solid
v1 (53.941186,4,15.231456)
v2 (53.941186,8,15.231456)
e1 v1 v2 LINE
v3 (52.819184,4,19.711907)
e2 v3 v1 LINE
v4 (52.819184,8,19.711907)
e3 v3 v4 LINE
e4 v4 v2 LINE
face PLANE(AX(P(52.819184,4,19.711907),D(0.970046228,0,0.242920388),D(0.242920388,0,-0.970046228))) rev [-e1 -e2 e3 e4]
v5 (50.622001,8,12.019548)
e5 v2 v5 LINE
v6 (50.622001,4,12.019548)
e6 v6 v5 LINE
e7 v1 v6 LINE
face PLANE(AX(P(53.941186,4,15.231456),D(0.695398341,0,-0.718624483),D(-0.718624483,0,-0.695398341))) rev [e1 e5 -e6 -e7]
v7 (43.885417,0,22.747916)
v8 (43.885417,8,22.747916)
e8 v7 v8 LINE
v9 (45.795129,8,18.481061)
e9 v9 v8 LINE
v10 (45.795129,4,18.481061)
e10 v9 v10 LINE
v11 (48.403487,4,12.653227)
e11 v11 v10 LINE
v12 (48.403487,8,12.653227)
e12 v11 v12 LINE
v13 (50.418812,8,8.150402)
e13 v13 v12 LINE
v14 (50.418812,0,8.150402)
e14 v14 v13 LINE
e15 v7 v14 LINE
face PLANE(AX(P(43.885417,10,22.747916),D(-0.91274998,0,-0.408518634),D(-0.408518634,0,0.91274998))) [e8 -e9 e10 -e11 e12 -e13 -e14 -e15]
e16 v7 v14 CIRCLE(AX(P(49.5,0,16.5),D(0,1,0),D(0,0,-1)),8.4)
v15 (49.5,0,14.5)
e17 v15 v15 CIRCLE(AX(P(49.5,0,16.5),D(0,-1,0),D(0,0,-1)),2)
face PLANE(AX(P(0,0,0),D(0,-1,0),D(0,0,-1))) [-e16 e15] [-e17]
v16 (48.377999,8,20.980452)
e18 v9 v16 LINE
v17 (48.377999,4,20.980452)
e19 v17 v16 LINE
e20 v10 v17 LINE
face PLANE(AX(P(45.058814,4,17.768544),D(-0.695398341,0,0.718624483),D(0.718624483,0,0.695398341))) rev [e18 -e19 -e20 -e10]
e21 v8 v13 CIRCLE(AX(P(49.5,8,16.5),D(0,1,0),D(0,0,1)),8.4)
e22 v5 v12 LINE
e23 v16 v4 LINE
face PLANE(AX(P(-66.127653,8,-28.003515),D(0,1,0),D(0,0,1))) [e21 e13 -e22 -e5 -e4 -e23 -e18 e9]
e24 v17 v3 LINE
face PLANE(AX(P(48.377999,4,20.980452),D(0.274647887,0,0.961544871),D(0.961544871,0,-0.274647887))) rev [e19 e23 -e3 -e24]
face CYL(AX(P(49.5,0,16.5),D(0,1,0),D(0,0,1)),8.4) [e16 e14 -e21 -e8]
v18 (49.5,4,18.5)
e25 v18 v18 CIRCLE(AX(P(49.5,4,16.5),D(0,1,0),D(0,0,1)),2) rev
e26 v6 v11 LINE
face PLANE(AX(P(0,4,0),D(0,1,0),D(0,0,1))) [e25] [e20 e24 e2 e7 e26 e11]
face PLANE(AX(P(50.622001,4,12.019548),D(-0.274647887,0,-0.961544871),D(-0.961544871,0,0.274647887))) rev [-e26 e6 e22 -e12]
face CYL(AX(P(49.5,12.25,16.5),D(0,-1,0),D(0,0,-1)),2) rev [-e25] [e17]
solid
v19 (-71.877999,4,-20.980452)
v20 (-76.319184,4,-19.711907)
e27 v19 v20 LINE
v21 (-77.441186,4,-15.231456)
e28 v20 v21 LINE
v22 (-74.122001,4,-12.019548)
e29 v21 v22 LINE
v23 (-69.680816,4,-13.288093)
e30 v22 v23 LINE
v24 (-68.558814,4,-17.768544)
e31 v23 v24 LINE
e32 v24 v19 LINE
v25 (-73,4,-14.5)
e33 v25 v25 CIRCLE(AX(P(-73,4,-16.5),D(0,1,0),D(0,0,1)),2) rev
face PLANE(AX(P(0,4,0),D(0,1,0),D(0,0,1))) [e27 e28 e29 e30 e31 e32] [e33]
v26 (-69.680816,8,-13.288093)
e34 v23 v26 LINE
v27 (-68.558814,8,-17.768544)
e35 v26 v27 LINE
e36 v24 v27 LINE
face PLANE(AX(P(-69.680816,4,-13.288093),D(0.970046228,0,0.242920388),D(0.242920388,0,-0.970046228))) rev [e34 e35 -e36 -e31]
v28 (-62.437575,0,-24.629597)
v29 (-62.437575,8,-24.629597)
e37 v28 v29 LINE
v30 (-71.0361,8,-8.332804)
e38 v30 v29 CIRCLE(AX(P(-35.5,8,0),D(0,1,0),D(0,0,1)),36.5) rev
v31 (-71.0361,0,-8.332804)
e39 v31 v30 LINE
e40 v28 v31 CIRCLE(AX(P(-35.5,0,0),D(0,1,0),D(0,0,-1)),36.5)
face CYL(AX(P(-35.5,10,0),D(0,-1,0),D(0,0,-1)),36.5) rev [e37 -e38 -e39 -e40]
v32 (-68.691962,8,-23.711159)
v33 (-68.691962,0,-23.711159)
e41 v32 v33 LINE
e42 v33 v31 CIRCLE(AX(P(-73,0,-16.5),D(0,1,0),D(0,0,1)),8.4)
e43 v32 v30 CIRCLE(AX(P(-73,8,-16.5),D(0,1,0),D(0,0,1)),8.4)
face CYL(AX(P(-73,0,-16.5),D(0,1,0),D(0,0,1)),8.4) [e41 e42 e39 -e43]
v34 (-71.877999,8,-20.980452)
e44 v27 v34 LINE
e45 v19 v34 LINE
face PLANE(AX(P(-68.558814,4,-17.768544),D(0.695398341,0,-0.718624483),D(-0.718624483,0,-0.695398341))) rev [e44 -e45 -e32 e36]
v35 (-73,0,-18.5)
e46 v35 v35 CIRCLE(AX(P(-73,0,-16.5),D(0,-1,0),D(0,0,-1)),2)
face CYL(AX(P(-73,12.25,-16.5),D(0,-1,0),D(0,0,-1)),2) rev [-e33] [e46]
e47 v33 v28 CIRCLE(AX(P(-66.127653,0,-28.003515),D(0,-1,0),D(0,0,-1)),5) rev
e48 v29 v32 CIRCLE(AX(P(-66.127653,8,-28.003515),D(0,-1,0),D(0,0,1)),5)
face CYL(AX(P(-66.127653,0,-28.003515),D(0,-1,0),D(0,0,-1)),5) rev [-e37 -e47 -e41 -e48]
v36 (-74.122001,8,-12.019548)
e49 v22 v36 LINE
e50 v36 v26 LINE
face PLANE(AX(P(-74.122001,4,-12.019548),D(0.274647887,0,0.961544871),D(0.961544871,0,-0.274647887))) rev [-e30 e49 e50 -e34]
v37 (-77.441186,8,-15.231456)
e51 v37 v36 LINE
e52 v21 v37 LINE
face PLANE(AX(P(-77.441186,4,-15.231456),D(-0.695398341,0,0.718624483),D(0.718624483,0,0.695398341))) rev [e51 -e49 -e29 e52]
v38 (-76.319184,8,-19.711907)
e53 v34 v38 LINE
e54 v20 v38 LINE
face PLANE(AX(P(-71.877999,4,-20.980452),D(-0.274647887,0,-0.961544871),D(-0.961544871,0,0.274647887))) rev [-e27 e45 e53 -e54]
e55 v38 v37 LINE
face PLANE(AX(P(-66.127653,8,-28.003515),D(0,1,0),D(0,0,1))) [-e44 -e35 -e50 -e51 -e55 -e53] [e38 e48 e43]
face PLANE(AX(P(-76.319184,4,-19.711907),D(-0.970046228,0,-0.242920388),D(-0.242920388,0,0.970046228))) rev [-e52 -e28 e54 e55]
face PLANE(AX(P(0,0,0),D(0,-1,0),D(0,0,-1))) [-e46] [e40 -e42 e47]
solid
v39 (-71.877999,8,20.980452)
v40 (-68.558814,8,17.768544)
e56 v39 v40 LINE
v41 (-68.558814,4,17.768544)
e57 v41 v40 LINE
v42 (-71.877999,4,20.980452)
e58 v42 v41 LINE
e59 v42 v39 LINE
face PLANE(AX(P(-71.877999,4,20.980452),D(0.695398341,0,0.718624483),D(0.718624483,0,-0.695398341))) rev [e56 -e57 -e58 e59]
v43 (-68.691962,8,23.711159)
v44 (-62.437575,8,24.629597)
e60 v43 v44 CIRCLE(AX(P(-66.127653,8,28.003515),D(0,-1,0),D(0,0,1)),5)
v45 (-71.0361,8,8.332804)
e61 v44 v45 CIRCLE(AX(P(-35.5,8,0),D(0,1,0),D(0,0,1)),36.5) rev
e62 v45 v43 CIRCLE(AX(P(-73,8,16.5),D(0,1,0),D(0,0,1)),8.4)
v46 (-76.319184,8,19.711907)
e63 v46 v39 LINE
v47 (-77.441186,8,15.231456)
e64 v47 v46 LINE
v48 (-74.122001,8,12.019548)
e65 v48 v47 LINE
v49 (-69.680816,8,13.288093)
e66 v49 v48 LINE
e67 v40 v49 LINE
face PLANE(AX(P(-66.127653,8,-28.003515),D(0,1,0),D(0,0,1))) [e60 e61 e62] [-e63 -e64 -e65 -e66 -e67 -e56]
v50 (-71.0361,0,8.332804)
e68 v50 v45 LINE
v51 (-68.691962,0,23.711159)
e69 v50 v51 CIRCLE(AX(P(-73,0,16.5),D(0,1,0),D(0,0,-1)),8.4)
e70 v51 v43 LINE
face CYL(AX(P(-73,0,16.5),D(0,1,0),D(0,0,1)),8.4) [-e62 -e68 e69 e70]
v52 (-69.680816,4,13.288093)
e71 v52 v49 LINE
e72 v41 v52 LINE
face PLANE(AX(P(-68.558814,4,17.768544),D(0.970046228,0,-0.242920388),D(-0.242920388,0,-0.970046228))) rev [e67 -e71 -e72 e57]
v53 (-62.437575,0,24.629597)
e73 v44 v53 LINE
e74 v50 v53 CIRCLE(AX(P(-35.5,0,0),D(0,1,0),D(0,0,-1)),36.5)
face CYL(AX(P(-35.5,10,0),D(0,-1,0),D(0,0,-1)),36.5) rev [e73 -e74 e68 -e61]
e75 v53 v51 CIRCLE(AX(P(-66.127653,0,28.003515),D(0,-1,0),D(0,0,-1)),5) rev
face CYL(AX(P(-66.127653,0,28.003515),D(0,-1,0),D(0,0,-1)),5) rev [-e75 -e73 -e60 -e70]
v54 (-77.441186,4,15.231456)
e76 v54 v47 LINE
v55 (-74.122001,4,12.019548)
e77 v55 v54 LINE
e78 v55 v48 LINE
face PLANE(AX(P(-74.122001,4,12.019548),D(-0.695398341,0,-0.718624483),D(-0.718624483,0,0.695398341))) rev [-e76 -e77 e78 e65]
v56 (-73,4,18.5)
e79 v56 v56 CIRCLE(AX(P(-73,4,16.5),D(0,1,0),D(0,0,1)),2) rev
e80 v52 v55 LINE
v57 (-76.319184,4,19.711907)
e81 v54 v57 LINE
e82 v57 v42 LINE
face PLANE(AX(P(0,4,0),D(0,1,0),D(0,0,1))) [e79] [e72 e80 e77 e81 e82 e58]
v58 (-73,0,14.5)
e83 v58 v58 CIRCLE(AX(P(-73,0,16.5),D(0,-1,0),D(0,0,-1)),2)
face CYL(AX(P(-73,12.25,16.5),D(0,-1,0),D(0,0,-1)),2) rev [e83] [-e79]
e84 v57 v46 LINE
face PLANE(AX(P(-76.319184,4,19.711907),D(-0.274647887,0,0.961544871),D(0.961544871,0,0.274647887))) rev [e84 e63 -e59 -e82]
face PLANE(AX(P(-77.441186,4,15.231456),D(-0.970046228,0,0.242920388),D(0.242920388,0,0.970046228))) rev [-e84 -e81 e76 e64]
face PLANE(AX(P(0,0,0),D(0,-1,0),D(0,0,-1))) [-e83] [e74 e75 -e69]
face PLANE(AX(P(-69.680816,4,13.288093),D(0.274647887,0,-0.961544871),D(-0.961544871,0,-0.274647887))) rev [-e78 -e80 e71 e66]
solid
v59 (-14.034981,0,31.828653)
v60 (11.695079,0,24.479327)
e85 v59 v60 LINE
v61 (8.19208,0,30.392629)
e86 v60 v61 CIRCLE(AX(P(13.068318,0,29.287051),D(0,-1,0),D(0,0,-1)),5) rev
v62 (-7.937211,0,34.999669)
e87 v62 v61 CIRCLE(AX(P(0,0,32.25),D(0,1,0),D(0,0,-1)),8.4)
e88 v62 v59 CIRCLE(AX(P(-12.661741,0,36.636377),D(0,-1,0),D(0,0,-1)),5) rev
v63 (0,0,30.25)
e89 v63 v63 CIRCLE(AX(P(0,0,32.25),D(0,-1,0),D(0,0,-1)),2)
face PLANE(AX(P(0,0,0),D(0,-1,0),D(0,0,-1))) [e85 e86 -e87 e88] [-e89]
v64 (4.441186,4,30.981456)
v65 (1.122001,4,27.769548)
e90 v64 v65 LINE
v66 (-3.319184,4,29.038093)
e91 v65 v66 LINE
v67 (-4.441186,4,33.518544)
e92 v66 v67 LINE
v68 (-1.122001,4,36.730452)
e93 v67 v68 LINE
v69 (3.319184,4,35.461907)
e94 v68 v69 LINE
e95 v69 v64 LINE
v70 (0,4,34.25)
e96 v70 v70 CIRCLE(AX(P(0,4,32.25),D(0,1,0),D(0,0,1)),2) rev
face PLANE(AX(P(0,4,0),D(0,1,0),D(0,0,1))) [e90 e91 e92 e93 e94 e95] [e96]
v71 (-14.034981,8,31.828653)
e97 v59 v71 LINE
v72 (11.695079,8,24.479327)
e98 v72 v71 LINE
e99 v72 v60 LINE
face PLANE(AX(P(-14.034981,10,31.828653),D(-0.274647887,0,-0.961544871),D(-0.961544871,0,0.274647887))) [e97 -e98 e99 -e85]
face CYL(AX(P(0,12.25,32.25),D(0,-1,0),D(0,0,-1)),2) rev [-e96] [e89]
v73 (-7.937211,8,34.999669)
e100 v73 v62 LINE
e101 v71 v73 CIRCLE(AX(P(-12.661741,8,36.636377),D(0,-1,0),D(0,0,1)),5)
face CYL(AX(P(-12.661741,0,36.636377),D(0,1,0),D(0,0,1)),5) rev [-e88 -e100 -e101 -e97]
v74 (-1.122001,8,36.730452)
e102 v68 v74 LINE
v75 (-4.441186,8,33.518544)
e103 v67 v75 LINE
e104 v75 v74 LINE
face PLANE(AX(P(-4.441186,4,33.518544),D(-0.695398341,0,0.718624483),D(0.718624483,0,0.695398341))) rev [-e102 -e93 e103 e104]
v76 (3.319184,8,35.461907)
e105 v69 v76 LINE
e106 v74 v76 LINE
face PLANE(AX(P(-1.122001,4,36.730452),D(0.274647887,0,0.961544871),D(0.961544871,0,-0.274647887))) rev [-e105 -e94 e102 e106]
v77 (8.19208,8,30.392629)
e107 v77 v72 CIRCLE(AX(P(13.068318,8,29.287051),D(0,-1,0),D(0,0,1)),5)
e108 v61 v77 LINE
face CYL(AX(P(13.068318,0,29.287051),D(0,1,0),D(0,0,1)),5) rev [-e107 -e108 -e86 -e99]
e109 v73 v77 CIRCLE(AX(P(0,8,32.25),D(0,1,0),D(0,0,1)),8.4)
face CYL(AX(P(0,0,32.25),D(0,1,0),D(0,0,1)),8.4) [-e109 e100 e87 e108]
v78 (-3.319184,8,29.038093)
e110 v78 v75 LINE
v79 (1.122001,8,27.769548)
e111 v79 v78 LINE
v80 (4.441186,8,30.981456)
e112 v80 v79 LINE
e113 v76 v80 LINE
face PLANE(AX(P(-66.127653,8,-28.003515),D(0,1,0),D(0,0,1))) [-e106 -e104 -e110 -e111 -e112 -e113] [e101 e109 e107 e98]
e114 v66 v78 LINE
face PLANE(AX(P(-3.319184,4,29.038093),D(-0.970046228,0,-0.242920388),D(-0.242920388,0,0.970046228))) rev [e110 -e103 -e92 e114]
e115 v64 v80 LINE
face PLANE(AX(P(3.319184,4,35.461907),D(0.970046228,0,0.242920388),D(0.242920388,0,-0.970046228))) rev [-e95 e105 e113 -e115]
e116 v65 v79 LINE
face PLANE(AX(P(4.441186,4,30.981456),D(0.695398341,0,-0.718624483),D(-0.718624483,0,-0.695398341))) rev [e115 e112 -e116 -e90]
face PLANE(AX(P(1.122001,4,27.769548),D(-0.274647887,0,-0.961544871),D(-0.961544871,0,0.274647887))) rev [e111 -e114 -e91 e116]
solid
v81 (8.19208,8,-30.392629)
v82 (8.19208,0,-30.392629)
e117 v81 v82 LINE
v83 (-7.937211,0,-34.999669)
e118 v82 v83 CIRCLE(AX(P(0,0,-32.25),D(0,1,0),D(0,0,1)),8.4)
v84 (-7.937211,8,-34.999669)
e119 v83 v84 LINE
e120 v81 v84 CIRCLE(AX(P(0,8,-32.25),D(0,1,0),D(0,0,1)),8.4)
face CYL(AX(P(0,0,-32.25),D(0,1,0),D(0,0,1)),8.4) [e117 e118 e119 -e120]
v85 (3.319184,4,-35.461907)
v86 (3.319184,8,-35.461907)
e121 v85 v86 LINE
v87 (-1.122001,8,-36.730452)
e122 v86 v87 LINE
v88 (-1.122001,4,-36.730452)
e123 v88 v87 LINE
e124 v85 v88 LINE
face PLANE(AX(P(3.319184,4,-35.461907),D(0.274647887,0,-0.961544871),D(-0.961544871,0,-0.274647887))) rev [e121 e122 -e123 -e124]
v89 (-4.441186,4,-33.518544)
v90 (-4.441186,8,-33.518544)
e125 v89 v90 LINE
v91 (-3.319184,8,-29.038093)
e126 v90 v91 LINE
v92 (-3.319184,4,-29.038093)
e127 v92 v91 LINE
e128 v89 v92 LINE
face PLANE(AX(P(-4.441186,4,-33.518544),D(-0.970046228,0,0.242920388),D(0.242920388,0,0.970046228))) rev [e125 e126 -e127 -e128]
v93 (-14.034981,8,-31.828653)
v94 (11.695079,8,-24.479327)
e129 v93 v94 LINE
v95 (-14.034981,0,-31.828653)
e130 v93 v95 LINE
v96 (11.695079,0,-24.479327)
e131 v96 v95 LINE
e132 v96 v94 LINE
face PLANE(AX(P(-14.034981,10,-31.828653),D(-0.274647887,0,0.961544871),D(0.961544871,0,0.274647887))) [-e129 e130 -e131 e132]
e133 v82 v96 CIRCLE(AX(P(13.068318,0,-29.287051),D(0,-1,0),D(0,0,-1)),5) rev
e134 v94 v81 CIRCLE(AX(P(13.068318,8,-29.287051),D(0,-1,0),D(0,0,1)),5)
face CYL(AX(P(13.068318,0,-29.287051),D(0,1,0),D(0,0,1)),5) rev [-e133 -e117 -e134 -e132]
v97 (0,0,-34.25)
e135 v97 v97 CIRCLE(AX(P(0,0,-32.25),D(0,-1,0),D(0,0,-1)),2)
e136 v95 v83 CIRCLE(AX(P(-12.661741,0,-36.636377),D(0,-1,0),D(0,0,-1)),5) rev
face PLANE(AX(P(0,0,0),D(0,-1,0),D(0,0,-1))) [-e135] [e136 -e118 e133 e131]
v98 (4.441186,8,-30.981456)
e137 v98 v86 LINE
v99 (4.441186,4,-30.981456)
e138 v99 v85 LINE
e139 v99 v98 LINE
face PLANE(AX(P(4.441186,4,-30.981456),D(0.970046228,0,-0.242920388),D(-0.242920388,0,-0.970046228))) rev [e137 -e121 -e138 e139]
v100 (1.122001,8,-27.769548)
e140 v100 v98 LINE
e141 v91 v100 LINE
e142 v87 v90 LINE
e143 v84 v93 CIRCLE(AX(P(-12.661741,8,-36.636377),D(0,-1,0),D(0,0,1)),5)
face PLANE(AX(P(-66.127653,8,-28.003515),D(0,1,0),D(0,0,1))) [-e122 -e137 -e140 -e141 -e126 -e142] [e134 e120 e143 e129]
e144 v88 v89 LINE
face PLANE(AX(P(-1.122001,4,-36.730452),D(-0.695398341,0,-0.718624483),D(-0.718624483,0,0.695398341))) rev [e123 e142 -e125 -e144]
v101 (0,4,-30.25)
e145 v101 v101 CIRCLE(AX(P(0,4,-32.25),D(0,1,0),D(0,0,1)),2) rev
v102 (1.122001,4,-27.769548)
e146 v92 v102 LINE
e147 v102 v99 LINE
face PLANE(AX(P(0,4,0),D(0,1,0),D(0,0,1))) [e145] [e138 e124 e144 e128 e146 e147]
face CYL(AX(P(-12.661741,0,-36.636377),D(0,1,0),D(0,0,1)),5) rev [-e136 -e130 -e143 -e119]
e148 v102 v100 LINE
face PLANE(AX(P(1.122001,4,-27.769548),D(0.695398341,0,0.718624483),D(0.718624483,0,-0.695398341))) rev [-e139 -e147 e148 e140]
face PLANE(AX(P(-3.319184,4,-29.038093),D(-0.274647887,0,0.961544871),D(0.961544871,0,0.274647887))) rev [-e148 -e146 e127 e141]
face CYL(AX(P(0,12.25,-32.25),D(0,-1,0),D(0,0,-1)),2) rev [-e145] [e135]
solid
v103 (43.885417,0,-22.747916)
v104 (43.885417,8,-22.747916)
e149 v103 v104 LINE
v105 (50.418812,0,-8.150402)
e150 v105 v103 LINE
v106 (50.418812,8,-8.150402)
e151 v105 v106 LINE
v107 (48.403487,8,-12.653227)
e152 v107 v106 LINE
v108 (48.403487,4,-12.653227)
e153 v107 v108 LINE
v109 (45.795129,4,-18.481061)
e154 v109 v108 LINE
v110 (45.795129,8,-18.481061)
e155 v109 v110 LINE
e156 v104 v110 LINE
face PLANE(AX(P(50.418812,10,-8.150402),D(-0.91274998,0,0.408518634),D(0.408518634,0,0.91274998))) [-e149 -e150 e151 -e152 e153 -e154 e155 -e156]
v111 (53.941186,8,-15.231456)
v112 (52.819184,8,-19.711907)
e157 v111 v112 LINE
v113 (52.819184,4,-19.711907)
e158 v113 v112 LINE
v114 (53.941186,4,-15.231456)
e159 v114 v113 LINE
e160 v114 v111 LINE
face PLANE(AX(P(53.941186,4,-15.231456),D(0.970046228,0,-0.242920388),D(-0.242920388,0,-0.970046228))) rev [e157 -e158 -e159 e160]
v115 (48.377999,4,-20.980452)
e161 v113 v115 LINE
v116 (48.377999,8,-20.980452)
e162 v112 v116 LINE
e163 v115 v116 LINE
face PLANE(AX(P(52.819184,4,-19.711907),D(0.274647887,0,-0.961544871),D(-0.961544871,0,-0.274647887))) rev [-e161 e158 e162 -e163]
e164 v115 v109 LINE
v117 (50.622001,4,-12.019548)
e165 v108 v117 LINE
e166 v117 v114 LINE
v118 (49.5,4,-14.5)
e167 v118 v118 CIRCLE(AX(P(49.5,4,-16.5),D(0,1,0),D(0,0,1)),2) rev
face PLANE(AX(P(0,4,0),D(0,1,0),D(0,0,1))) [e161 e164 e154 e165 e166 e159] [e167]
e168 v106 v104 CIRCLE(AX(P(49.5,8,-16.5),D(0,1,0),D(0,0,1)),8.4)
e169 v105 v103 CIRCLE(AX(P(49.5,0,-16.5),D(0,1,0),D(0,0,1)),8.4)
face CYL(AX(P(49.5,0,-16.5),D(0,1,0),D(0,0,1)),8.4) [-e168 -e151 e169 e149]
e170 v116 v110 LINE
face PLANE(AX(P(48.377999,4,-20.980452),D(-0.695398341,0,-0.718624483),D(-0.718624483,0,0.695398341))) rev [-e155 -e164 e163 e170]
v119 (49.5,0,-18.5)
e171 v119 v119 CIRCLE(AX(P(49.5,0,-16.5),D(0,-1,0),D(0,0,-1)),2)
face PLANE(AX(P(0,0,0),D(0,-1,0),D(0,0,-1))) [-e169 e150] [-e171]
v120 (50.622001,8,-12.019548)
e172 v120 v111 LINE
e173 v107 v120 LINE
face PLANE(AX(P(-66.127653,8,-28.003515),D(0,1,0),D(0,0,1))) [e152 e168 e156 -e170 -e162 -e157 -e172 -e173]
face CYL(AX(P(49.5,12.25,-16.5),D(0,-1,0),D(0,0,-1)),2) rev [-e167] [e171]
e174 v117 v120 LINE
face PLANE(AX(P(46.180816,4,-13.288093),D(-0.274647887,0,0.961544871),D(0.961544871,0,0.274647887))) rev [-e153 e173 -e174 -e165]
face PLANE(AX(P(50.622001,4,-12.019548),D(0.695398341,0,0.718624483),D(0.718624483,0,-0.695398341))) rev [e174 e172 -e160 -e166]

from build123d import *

# Parameters (mm, degrees)
SKETCH1_W               = 200
SKETCH1_H               = 150
SKETCH1_R               = 6
SKETCH1_R_2             = 13.5
SKETCH1_R_3             = 2
SKETCH1_R_4             = 2.5
BOSS_EXTRUDE1_DEPTH     = 4
SKETCH3_W               = 200
SKETCH3_H               = 150
BOSS_EXTRUDE2_DEPTH     = 8.25
SKETCH6_R               = 5.4
CUT_EXTRUDE2_DEPTH      = 8.25
FILLET1_R               = 2.5
FILLET2_R               = 5
SKETCH2_R               = 4.4
SKETCH2_R_2             = 5.4
CUT_EXTRUDE1_DEPTH      = 2
CUT_EXTRUDE3_DEPTH      = 126.598815828
CUT_EXTRUDE3_DEPTH_BACK = 126.598815828
SKETCH8_R               = 2
CUT_EXTRUDE6_DEPTH      = 126.598815818
CUT_EXTRUDE6_DEPTH_BACK = 126.598815818
SKETCH13_OUTSIDE_W      = 252.06
SKETCH13_OUTSIDE_H      = 202.06
FILLET4_R               = 5
CUT_EXTRUDE7_START      = -10.25
CUT_EXTRUDE7_DEPTH      = 10.25
SKETCH17_R              = 2
BOSS_EXTRUDE3_DEPTH     = 2
SKETCH18_R              = 13.5
SKETCH18_R_2            = 2
SKETCH18_R_3            = 2.5
SKETCH18_R_4            = 6
BOSS_EXTRUDE4_DEPTH     = 6
CUT_EXTRUDE8_DEPTH      = 92.336643939
CUT_EXTRUDE8_DEPTH_BACK = 92.336643939
SKETCH19_R              = 19.5
SKETCH19_R_2            = 0.75
CUT_EXTRUDE9_DEPTH      = 4
CUT_EXTRUDE10_DEPTH     = 4
SKETCH22_OUTSIDE_W      = 173.598
SKETCH22_OUTSIDE_H      = 115.598
CUT_EXTRUDE12_DEPTH     = 10


with BuildPart() as part:
    # Sketch1 → Boss-Extrude1 (new body)
    with BuildSketch(Plane(origin=(0, 0, 0), x_dir=(1, 0, 0), z_dir=(0, 1, 0))):
        Rectangle(SKETCH1_W, SKETCH1_H)
        with Locations(Location((35.5, 0, 0), (0, 0, 270))):
            Circle(SKETCH1_R, mode=Mode.SUBTRACT)
        with Locations(Location((-35.5, 0, 0), (0, 0, 270))):
            Circle(SKETCH1_R_2, mode=Mode.SUBTRACT)
        with Locations(Location((-60.5, 0, 0), (0, 0, 270))):
            Circle(SKETCH1_R_3, mode=Mode.SUBTRACT)
        with Locations(Location((-35.5, 25, 0), (0, 0, 270))):
            Circle(SKETCH1_R_3, mode=Mode.SUBTRACT)
        with Locations(Location((-10.5, 0, 0), (0, 0, 270))):
            Circle(SKETCH1_R_3, mode=Mode.SUBTRACT)
        with Locations(Location((-35.5, -25, 0), (0, 0, 270))):
            Circle(SKETCH1_R_3, mode=Mode.SUBTRACT)
        with Locations(Location((35.5, 18.5, 0), (0, 0, 270))):
            Circle(SKETCH1_R_4, mode=Mode.SUBTRACT)
        with Locations(Location((35.5, -18.5, 0), (0, 0, 90))):
            Circle(SKETCH1_R_4, mode=Mode.SUBTRACT)
        Polygon((4.517711304, -15.136418767), (0.159242352, 0.258507293), (4.681501882, 1.538807548), (9.039970835, -13.856118512), (9.584779454, -15.78048427), (5.062519924, -17.060784524), align=None, mode=Mode.SUBTRACT)
    extrude(amount=BOSS_EXTRUDE1_DEPTH)

    # Sketch3 → Boss-Extrude2 (add)
    with BuildSketch(Plane(origin=(0, 4, 0), x_dir=(1, 0, 0), z_dir=(0, 1, 0))):
        Rectangle(SKETCH3_W, SKETCH3_H)
        with BuildLine():
            Line((-26.573943662, 31.250208291), (39.070422535, 12.500083317))
            ThreePointArc((39.070422535, 12.500083317), (48.5, 0), (39.070422535, -12.500083317))
            Line((39.070422535, -12.500083317), (-26.573943662, -31.250208291))
            ThreePointArc((-26.573943662, -31.250208291), (-68, 0), (-26.573943662, 31.250208291))
        make_face(mode=Mode.SUBTRACT)
    extrude(amount=BOSS_EXTRUDE2_DEPTH)

    # Sketch6 → Cut-Extrude2 (cut)
    with BuildSketch(Plane(origin=(0, 12.25, 0), x_dir=(1, 0, 0), z_dir=(0, 1, 0))):
        with Locations((35.5, 18.5)):
            Circle(SKETCH6_R)
        with Locations((35.5, -18.5)):
            Circle(SKETCH6_R)
    extrude(amount=-CUT_EXTRUDE2_DEPTH, mode=Mode.SUBTRACT)

    # Fillet1
    # the kernel refuses this fillet: 2.5 mm, written as the material it adds along each edge
    with BuildSketch(Plane(origin=(9.584779454, 0, 15.78048427), x_dir=(-0.9621828787440704, 0, 0.2724043095323078), z_dir=(0, 1, 0)), Plane(origin=(5.062519924, 0, 17.060784524), x_dir=(-0.2724043095323296, 0, -0.9621828787440644), z_dir=(0, 1, 0)), Plane(origin=(4.681501882, 0, -1.538807548), x_dir=(0.2724043095323091, 0, 0.96218287874407), z_dir=(0, 1, 0))) as fillet1_piece_1:
        with BuildLine():
            CenterArc((FILLET1_R, -FILLET1_R), FILLET1_R, 90, 90)
            Line((0, -FILLET1_R), (0, 0))
            Line((0, 0), (FILLET1_R, 0))
        make_face()
    extrude(amount=4)
    with BuildSketch(Plane(origin=(0.159242352, 0, -0.258507293), x_dir=(0.272404309532306, 0, 0.962182878744071), z_dir=(0, 1, 0))) as fillet1_piece_2:
        with BuildLine():
            CenterArc((FILLET1_R, FILLET1_R), FILLET1_R, 180, 90)
            Line((0, FILLET1_R), (0, 0))
            Line((0, 0), (FILLET1_R, 0))
        make_face()
    extrude(amount=4)

    # Fillet2
    fillet2_edges = [part.edges().sort_by_distance(p)[0] for p in [
        (31.784909874, 8.125, 14.581058133),
        (36.584743308, 8.125, 13.210072594),
        (36.584743308, 8.125, -13.210072594),
        (31.784909874, 8.125, -14.581058133),
    ]]
    fillet(fillet2_edges, radius=FILLET2_R)

    # Sketch2 → Cut-Extrude1 (cut)
    with BuildSketch(Plane(origin=(0, 4, 0), x_dir=(1, 0, 0), z_dir=(0, 1, 0))):
        with Locations(Location((-35.5, 25, 0), (0, 0, 270))):
            Circle(SKETCH2_R)
        with Locations(Location((-10.5, 0, 0), (0, 0, 270))):
            Circle(SKETCH2_R)
        with Locations(Location((-35.5, -25, 0), (0, 0, 270))):
            Circle(SKETCH2_R)
        with Locations(Location((-60.5, 0, 0), (0, 0, 270))):
            Circle(SKETCH2_R)
        with Locations(Location((35.5, 18.5, 0), (0, 0, 270))):
            Circle(SKETCH2_R_2)
        with Locations(Location((35.5, -18.5, 0), (0, 0, 197.105868404))):
            Circle(SKETCH2_R_2)
    extrude(amount=-CUT_EXTRUDE1_DEPTH, mode=Mode.SUBTRACT)

    # Sketch8 → Cut-Extrude3 (cut, two sides: drawn at the far end of the back side and taken through both)
    with BuildSketch(Plane.XZ.offset(-CUT_EXTRUDE3_DEPTH_BACK)):
        with Locations(Location((49.5, 16.5, 0), (0, 0, 270))):
            Circle(SKETCH8_R)
        with Locations(Location((-73, 16.5, 0), (0, 0, 270))):
            Circle(SKETCH8_R)
        with Locations(Location((0, 32.25, 0), (0, 0, 270))):
            Circle(SKETCH8_R)
        with Locations(Location((-73, -16.5, 0), (0, 0, 270))):
            Circle(SKETCH8_R)
        with Locations(Location((0, -32.25, 0), (0, 0, 270))):
            Circle(SKETCH8_R)
        with Locations(Location((49.5, -16.5, 0), (0, 0, 270))):
            Circle(SKETCH8_R)
    extrude(amount=CUT_EXTRUDE3_DEPTH + CUT_EXTRUDE3_DEPTH_BACK, mode=Mode.SUBTRACT)

    # Sketch13 outside → Cut-Extrude6 (cut, two sides: drawn at the far end of the back side and taken through both)
    with BuildSketch(Plane(origin=(0, 12.25, 0), x_dir=(1, 0, 0), z_dir=(0, 1, 0)).offset(-CUT_EXTRUDE6_DEPTH_BACK)):
        Rectangle(SKETCH13_OUTSIDE_W, SKETCH13_OUTSIDE_H)
        with BuildLine():
            Line((-8.131291348, 30.142370761), (-25.475352113, 35.096387773))
            ThreePointArc((-25.475352113, 35.096387773), (-47.910899113, 34.325203324), (-65.651791262, 20.569868344))
            ThreePointArc((-65.651791262, 20.569868344), (-80.688646272, 19.88300436), (-71.036099712, 8.332803684))
            ThreePointArc((-71.036099712, 8.332803684), (-72, 0), (-71.036099712, -8.332803684))
            ThreePointArc((-71.036099712, -8.332803684), (-80.688646272, -19.88300436), (-65.651791262, -20.569868344))
            ThreePointArc((-65.651791262, -20.569868344), (-47.910899113, -34.325203324), (-25.475352113, -35.096387773))
            Line((-25.475352113, -35.096387773), (-8.131291348, -30.142370761))
            ThreePointArc((-8.131291348, -30.142370761), (2.307042254, -40.326976912), (5.791389082, -26.165609111))
            Line((5.791389082, -26.165609111), (25.285418022, -20.597492606))
            ThreePointArc((25.285418022, -20.597492606), (26.036864948, -20.680025145), (26.515828803, -21.264899257))
            ThreePointArc((26.515828803, -21.264899257), (34.700336728, -27.865924335), (43.885416553, -22.74791587))
            ThreePointArc((43.885416553, -22.74791587), (57.167099831, -19.931556524), (50.418811796, -8.150402112))
            ThreePointArc((50.418811796, -8.150402112), (52.5, 0), (50.418811796, 8.150402112))
            ThreePointArc((50.418811796, 8.150402112), (57.167099831, 19.931556524), (43.885416553, 22.74791587))
            ThreePointArc((43.885416553, 22.74791587), (34.700336728, 27.865924335), (26.515828803, 21.264899257))
            ThreePointArc((26.515828803, 21.264899257), (26.036864948, 20.680025145), (25.285418022, 20.597492606))
            Line((25.285418022, 20.597492606), (5.791389082, 26.165609111))
            ThreePointArc((5.791389082, 26.165609111), (2.307042254, 40.326976912), (-8.131291348, 30.142370761))
        make_face(mode=Mode.SUBTRACT)
    extrude(amount=CUT_EXTRUDE6_DEPTH + CUT_EXTRUDE6_DEPTH_BACK, mode=Mode.SUBTRACT)

    # Fillet4
    fillet4_edges = [part.edges().sort_by_distance(p)[0] for p in [
        (-65.651791262, 6.125, -20.569868344),
        (-8.131291348, 6.125, -30.142370761),
        (5.791389082, 6.125, -26.165609111),
        (5.791389082, 6.125, 26.165609111),
        (-8.131291348, 6.125, 30.142370761),
        (-65.651791262, 6.125, 20.569868344),
    ]]
    fillet(fillet4_edges, radius=FILLET4_R)

    # Sketch16 → Cut-Extrude7 (cut)
    with BuildSketch(Plane(origin=(0, 12.25, 0), x_dir=(1, 0, 0), z_dir=(0, 1, 0)).offset(CUT_EXTRUDE7_START)):
        with BuildLine():
            Line((-25.475352113, -35.096387773), (-14.034980843, -31.828652803))
            ThreePointArc((-14.034980843, -31.828652803), (-10.35487685, -32.200345605), (-7.937211031, -34.999669261))
            ThreePointArc((-7.937211031, -34.999669261), (2.307042254, -40.326976912), (8.192079949, -30.392629249))
            ThreePointArc((8.192079949, -30.392629249), (8.766483762, -26.738675062), (11.695078578, -24.479327069))
            Line((11.695078578, -24.479327069), (25.285418022, -20.597492606))
            ThreePointArc((25.285418022, -20.597492606), (26.036864948, -20.680025145), (26.515828803, -21.264899257))
            ThreePointArc((26.515828803, -21.264899257), (34.700336728, -27.865924335), (43.885416553, -22.74791587))
            ThreePointArc((43.885416553, -22.74791587), (57.167099831, -19.931556524), (50.418811796, -8.150402112))
            ThreePointArc((50.418811796, -8.150402112), (52.5, 0), (50.418811796, 8.150402112))
            ThreePointArc((50.418811796, 8.150402112), (57.167099831, 19.931556524), (43.885416553, 22.74791587))
            ThreePointArc((43.885416553, 22.74791587), (34.700336728, 27.865924335), (26.515828803, 21.264899257))
            ThreePointArc((26.515828803, 21.264899257), (26.036864948, 20.680025145), (25.285418022, 20.597492606))
            Line((25.285418022, 20.597492606), (11.695078578, 24.479327069))
            ThreePointArc((11.695078578, 24.479327069), (8.766483762, 26.738675062), (8.192079949, 30.392629249))
            ThreePointArc((8.192079949, 30.392629249), (2.307042254, 40.326976912), (-7.937211031, 34.999669261))
            ThreePointArc((-7.937211031, 34.999669261), (-10.35487685, 32.200345605), (-14.034980843, 31.828652803))
            Line((-14.034980843, 31.828652803), (-25.475352113, 35.096387773))
            ThreePointArc((-25.475352113, 35.096387773), (-45.44485792, 35.119080298), (-62.437574746, 24.629597374))
            ThreePointArc((-62.437574746, 24.629597374), (-65.401208588, 23.05656851), (-68.691961882, 23.711158546))
            ThreePointArc((-68.691961882, 23.711158546), (-81.304080467, 17.765799193), (-71.036099712, 8.332803684))
            ThreePointArc((-71.036099712, 8.332803684), (-72, 0), (-71.036099712, -8.332803684))
            ThreePointArc((-71.036099712, -8.332803684), (-81.304080467, -17.765799193), (-68.691961882, -23.711158546))
            ThreePointArc((-68.691961882, -23.711158546), (-65.401208588, -23.05656851), (-62.437574746, -24.629597374))
            ThreePointArc((-62.437574746, -24.629597374), (-45.44485792, -35.119080298), (-25.475352113, -35.096387773))
        make_face()
    extrude(amount=CUT_EXTRUDE7_DEPTH, mode=Mode.SUBTRACT)

    # Sketch17 → Boss-Extrude3 (add)
    with BuildSketch(Plane.XZ):
        with Locations((-10.5, 0)):
            Circle(SKETCH17_R)
        with Locations((-35.5, -25)):
            Circle(SKETCH17_R)
        with Locations((-35.5, 25)):
            Circle(SKETCH17_R)
        with Locations((-60.5, 0)):
            Circle(SKETCH17_R)
        with BuildLine():
            Line((4.38150915, 14.655327328), (0.840253126, 2.146949904))
            ThreePointArc((0.840253126, 2.146949904), (1.027633585, 0.312624087), (2.421599042, -0.894323694))
            ThreePointArc((2.421599042, -0.894323694), (4.241377267, -0.597221274), (5.362512656, 0.866649649))
            Line((5.362512656, 0.866649649), (8.90376868, 13.375027073))
            ThreePointArc((8.90376868, 13.375027073), (8.71638822, 15.209352889), (7.322422764, 16.41630067))
            ThreePointArc((7.322422764, 16.41630067), (5.502644538, 16.11919825), (4.38150915, 14.655327328))
        make_face()
    extrude(amount=-BOSS_EXTRUDE3_DEPTH)

    # Sketch18 → Boss-Extrude4 (add)
    with BuildSketch(Plane(origin=(0, 2, 0), x_dir=(1, 0, 0), z_dir=(0, 1, 0))):
        with BuildLine():
            Line((-25.475352113, -35.096387773), (-14.034980843, -31.828652803))
            ThreePointArc((-14.034980843, -31.828652803), (-10.35487685, -32.200345605), (-7.937211031, -34.999669261))
            ThreePointArc((-7.937211031, -34.999669261), (2.307042254, -40.326976912), (8.192079949, -30.392629249))
            ThreePointArc((8.192079949, -30.392629249), (8.766483762, -26.738675062), (11.695078578, -24.479327069))
            Line((11.695078578, -24.479327069), (25.285418022, -20.597492606))
            ThreePointArc((25.285418022, -20.597492606), (26.036864948, -20.680025145), (26.515828803, -21.264899257))
            ThreePointArc((26.515828803, -21.264899257), (34.700336728, -27.865924335), (43.885416553, -22.74791587))
            ThreePointArc((43.885416553, -22.74791587), (57.167099831, -19.931556524), (50.418811796, -8.150402112))
            ThreePointArc((50.418811796, -8.150402112), (52.5, 0), (50.418811796, 8.150402112))
            ThreePointArc((50.418811796, 8.150402112), (57.167099831, 19.931556524), (43.885416553, 22.74791587))
            ThreePointArc((43.885416553, 22.74791587), (34.700336728, 27.865924335), (26.515828803, 21.264899257))
            ThreePointArc((26.515828803, 21.264899257), (26.036864948, 20.680025145), (25.285418022, 20.597492606))
            Line((25.285418022, 20.597492606), (11.695078578, 24.479327069))
            ThreePointArc((11.695078578, 24.479327069), (8.766483762, 26.738675062), (8.192079949, 30.392629249))
            ThreePointArc((8.192079949, 30.392629249), (2.307042254, 40.326976912), (-7.937211031, 34.999669261))
            ThreePointArc((-7.937211031, 34.999669261), (-10.35487685, 32.200345605), (-14.034980843, 31.828652803))
            Line((-14.034980843, 31.828652803), (-25.475352113, 35.096387773))
            ThreePointArc((-25.475352113, 35.096387773), (-45.44485792, 35.119080298), (-62.437574746, 24.629597374))
            ThreePointArc((-62.437574746, 24.629597374), (-65.401208588, 23.05656851), (-68.691961882, 23.711158546))
            ThreePointArc((-68.691961882, 23.711158546), (-81.304080467, 17.765799193), (-71.036099712, 8.332803684))
            ThreePointArc((-71.036099712, 8.332803684), (-72, 0), (-71.036099712, -8.332803684))
            ThreePointArc((-71.036099712, -8.332803684), (-81.304080467, -17.765799193), (-68.691961882, -23.711158546))
            ThreePointArc((-68.691961882, -23.711158546), (-65.401208588, -23.05656851), (-62.437574746, -24.629597374))
            ThreePointArc((-62.437574746, -24.629597374), (-45.44485792, -35.119080298), (-25.475352113, -35.096387773))
        make_face()
        with Locations(Location((-35.5, 0, 0), (0, 0, 270))):
            Circle(SKETCH18_R, mode=Mode.SUBTRACT)
        with Locations(Location((0, 32.25, 0), (0, 0, 90))):
            Circle(SKETCH18_R_2, mode=Mode.SUBTRACT)
        with Locations(Location((-73, 16.5, 0), (0, 0, 90))):
            Circle(SKETCH18_R_2, mode=Mode.SUBTRACT)
        with Locations(Location((-73, -16.5, 0), (0, 0, 90))):
            Circle(SKETCH18_R_2, mode=Mode.SUBTRACT)
        with Locations(Location((0, -32.25, 0), (0, 0, 90))):
            Circle(SKETCH18_R_2, mode=Mode.SUBTRACT)
        with Locations(Location((35.5, -18.5, 0), (0, 0, 90))):
            Circle(SKETCH18_R_3, mode=Mode.SUBTRACT)
        with Locations(Location((35.5, 0, 0), (0, 0, 270))):
            Circle(SKETCH18_R_4, mode=Mode.SUBTRACT)
        with Locations(Location((49.5, -16.5, 0), (0, 0, 90))):
            Circle(SKETCH18_R_2, mode=Mode.SUBTRACT)
        with Locations(Location((35.5, 18.5, 0), (0, 0, 270))):
            Circle(SKETCH18_R_3, mode=Mode.SUBTRACT)
        with Locations(Location((49.5, 16.5, 0), (0, 0, 90))):
            Circle(SKETCH18_R_2, mode=Mode.SUBTRACT)
    extrude(amount=BOSS_EXTRUDE4_DEPTH)

    # Sketch19 → Cut-Extrude8 (cut, two sides: drawn at the far end of the back side and taken through both)
    with BuildSketch(Plane.XZ.offset(-CUT_EXTRUDE8_DEPTH_BACK)):
        with Locations(Location((-35.5, 0, 0), (0, 0, 270))):
            Circle(SKETCH19_R)
        with Locations(Location((35.5, 9.525, 0), (0, 0, 270))):
            Circle(SKETCH19_R_2)
        with Locations(Location((35.5, -9.525, 0), (0, 0, 270))):
            Circle(SKETCH19_R_2)
    extrude(amount=CUT_EXTRUDE8_DEPTH + CUT_EXTRUDE8_DEPTH_BACK, mode=Mode.SUBTRACT)

    # Sketch20 → Cut-Extrude9 (cut)
    with BuildSketch(Plane.XZ):
        Polygon((40.118802154, 18.5), (37.809401077, 22.5), (33.190598923, 22.5), (30.881197846, 18.5), (33.190598923, 14.5), (37.809401077, 14.5), align=None)
        Polygon((40.118802154, -18.5), (37.809401077, -14.5), (33.190598923, -14.5), (30.881197846, -18.5), (33.190598923, -22.5), (37.809401077, -22.5), align=None)
    extrude(amount=-CUT_EXTRUDE9_DEPTH, mode=Mode.SUBTRACT)

    # Sketch21 → Cut-Extrude10 (cut)
    with BuildSketch(Plane(origin=(0, 8, 0), x_dir=(1, 0, 0), z_dir=(0, 1, 0))):
        Polygon((-69.680815691, 13.288092645), (-68.558814481, 17.768544253), (-71.87799879, 20.980451609), (-76.319184309, 19.711907355), (-77.441185519, 15.231455747), (-74.12200121, 12.019548391), align=None)
        Polygon((-69.680815691, -13.288092645), (-74.12200121, -12.019548391), (-77.441185519, -15.231455747), (-76.319184309, -19.711907355), (-71.87799879, -20.980451609), (-68.558814481, -17.768544253), align=None)
        Polygon((4.441185519, 30.981455747), (3.319184309, 35.461907355), (-1.12200121, 36.730451609), (-4.441185519, 33.518544253), (-3.319184309, 29.038092645), (1.12200121, 27.769548391), align=None)
        Polygon((50.62200121, 12.019548391), (53.941185519, 15.231455747), (52.819184309, 19.711907355), (48.37799879, 20.980451609), (45.058814481, 17.768544253), (46.180815691, 13.288092645), align=None)
        Polygon((53.941185519, -15.231455747), (50.62200121, -12.019548391), (46.180815691, -13.288092645), (45.058814481, -17.768544253), (48.37799879, -20.980451609), (52.819184309, -19.711907355), align=None)
        Polygon((4.441185519, -30.981455747), (1.12200121, -27.769548391), (-3.319184309, -29.038092645), (-4.441185519, -33.518544253), (-1.12200121, -36.730451609), (3.319184309, -35.461907355), align=None)
    extrude(amount=-CUT_EXTRUDE10_DEPTH, mode=Mode.SUBTRACT)

    # Sketch22 outside → Cut-Extrude12 (cut)
    with BuildSketch(Plane.XZ):
        with Locations((-11.75, 0)):
            Rectangle(SKETCH22_OUTSIDE_W, SKETCH22_OUTSIDE_H)
        with BuildLine():
            Line((-14.034980843, 31.828652803), (11.695078578, 24.479327069))
            ThreePointArc((11.695078578, 24.479327069), (8.766483762, 26.738675062), (8.192079949, 30.392629249))
            ThreePointArc((8.192079949, 30.392629249), (2.307042254, 40.326976912), (-7.937211031, 34.999669261))
            ThreePointArc((-7.937211031, 34.999669261), (-10.35487685, 32.200345605), (-14.034980843, 31.828652803))
        make_face(mode=Mode.SUBTRACT)
        with BuildLine():
            Line((-14.034980843, -31.828652803), (11.695078578, -24.479327069))
            ThreePointArc((11.695078578, -24.479327069), (8.766483762, -26.738675062), (8.192079949, -30.392629249))
            ThreePointArc((8.192079949, -30.392629249), (2.307042254, -40.326976912), (-7.937211031, -34.999669261))
            ThreePointArc((-7.937211031, -34.999669261), (-10.35487685, -32.200345605), (-14.034980843, -31.828652803))
        make_face(mode=Mode.SUBTRACT)
        with BuildLine():
            Line((43.885416553, 22.74791587), (50.418811796, 8.150402112))
            ThreePointArc((50.418811796, 8.150402112), (57.167099831, 19.931556524), (43.885416553, 22.74791587))
        make_face(mode=Mode.SUBTRACT)
        with BuildLine():
            Line((50.418811796, -8.150402112), (43.885416553, -22.74791587))
            ThreePointArc((43.885416553, -22.74791587), (57.167099831, -19.931556524), (50.418811796, -8.150402112))
        make_face(mode=Mode.SUBTRACT)
        with BuildLine():
            ThreePointArc((-62.437574746, 24.629597374), (-67.78213703, 17.032722295), (-71.036099712, 8.332803684))
            ThreePointArc((-71.036099712, 8.332803684), (-81.304080467, 17.765799193), (-68.691961882, 23.711158546))
            ThreePointArc((-68.691961882, 23.711158546), (-65.401208588, 23.05656851), (-62.437574746, 24.629597374))
        make_face(mode=Mode.SUBTRACT)
        with BuildLine():
            ThreePointArc((-71.036099712, -8.332803684), (-67.78213703, -17.032722295), (-62.437574746, -24.629597374))
            ThreePointArc((-62.437574746, -24.629597374), (-65.401208588, -23.05656851), (-68.691961882, -23.711158546))
            ThreePointArc((-68.691961882, -23.711158546), (-81.304080467, -17.765799193), (-71.036099712, -8.332803684))
        make_face(mode=Mode.SUBTRACT)
    extrude(amount=-CUT_EXTRUDE12_DEPTH, mode=Mode.SUBTRACT)


with BuildPart() as cut_extrude12_piece_1:
    # of the separate pieces the step leaves, piece 1, a body of its own (cut_extrude12_pieces)
    add(part.part.solids().sort_by_distance((11.695078578, 0, 24.479327069))[0])


with BuildPart() as cut_extrude12_piece_2:
    # of the separate pieces the step leaves, piece 2, a body of its own (cut_extrude12_pieces)
    add(part.part.solids().sort_by_distance((8.192079949, 0, -30.392629249))[0])


with BuildPart() as cut_extrude12_piece_3:
    # of the separate pieces the step leaves, piece 3, a body of its own (cut_extrude12_pieces)
    add(part.part.solids().sort_by_distance((-68.691961882, 0, -23.711158546))[0])


with BuildPart() as cut_extrude12_piece_4:
    # of the separate pieces the step leaves, piece 4, a body of its own (cut_extrude12_pieces)
    add(part.part.solids().sort_by_distance((-68.691961882, 0, 23.711158546))[0])


with BuildPart() as cut_extrude12_piece_5:
    # of the separate pieces the step leaves, piece 5, a body of its own (cut_extrude12_pieces)
    add(part.part.solids().sort_by_distance((43.885416553, 0, 22.74791587))[0])


with BuildPart() as cut_extrude12_piece_6:
    # of the separate pieces the step leaves, piece 6, a body of its own (cut_extrude12_pieces)
    add(part.part.solids().sort_by_distance((50.418811796, 0, -8.150402112))[0])


solid = Compound([cut_extrude12_piece_1.part, cut_extrude12_piece_2.part, cut_extrude12_piece_3.part, cut_extrude12_piece_4.part, cut_extrude12_piece_5.part, cut_extrude12_piece_6.part])
